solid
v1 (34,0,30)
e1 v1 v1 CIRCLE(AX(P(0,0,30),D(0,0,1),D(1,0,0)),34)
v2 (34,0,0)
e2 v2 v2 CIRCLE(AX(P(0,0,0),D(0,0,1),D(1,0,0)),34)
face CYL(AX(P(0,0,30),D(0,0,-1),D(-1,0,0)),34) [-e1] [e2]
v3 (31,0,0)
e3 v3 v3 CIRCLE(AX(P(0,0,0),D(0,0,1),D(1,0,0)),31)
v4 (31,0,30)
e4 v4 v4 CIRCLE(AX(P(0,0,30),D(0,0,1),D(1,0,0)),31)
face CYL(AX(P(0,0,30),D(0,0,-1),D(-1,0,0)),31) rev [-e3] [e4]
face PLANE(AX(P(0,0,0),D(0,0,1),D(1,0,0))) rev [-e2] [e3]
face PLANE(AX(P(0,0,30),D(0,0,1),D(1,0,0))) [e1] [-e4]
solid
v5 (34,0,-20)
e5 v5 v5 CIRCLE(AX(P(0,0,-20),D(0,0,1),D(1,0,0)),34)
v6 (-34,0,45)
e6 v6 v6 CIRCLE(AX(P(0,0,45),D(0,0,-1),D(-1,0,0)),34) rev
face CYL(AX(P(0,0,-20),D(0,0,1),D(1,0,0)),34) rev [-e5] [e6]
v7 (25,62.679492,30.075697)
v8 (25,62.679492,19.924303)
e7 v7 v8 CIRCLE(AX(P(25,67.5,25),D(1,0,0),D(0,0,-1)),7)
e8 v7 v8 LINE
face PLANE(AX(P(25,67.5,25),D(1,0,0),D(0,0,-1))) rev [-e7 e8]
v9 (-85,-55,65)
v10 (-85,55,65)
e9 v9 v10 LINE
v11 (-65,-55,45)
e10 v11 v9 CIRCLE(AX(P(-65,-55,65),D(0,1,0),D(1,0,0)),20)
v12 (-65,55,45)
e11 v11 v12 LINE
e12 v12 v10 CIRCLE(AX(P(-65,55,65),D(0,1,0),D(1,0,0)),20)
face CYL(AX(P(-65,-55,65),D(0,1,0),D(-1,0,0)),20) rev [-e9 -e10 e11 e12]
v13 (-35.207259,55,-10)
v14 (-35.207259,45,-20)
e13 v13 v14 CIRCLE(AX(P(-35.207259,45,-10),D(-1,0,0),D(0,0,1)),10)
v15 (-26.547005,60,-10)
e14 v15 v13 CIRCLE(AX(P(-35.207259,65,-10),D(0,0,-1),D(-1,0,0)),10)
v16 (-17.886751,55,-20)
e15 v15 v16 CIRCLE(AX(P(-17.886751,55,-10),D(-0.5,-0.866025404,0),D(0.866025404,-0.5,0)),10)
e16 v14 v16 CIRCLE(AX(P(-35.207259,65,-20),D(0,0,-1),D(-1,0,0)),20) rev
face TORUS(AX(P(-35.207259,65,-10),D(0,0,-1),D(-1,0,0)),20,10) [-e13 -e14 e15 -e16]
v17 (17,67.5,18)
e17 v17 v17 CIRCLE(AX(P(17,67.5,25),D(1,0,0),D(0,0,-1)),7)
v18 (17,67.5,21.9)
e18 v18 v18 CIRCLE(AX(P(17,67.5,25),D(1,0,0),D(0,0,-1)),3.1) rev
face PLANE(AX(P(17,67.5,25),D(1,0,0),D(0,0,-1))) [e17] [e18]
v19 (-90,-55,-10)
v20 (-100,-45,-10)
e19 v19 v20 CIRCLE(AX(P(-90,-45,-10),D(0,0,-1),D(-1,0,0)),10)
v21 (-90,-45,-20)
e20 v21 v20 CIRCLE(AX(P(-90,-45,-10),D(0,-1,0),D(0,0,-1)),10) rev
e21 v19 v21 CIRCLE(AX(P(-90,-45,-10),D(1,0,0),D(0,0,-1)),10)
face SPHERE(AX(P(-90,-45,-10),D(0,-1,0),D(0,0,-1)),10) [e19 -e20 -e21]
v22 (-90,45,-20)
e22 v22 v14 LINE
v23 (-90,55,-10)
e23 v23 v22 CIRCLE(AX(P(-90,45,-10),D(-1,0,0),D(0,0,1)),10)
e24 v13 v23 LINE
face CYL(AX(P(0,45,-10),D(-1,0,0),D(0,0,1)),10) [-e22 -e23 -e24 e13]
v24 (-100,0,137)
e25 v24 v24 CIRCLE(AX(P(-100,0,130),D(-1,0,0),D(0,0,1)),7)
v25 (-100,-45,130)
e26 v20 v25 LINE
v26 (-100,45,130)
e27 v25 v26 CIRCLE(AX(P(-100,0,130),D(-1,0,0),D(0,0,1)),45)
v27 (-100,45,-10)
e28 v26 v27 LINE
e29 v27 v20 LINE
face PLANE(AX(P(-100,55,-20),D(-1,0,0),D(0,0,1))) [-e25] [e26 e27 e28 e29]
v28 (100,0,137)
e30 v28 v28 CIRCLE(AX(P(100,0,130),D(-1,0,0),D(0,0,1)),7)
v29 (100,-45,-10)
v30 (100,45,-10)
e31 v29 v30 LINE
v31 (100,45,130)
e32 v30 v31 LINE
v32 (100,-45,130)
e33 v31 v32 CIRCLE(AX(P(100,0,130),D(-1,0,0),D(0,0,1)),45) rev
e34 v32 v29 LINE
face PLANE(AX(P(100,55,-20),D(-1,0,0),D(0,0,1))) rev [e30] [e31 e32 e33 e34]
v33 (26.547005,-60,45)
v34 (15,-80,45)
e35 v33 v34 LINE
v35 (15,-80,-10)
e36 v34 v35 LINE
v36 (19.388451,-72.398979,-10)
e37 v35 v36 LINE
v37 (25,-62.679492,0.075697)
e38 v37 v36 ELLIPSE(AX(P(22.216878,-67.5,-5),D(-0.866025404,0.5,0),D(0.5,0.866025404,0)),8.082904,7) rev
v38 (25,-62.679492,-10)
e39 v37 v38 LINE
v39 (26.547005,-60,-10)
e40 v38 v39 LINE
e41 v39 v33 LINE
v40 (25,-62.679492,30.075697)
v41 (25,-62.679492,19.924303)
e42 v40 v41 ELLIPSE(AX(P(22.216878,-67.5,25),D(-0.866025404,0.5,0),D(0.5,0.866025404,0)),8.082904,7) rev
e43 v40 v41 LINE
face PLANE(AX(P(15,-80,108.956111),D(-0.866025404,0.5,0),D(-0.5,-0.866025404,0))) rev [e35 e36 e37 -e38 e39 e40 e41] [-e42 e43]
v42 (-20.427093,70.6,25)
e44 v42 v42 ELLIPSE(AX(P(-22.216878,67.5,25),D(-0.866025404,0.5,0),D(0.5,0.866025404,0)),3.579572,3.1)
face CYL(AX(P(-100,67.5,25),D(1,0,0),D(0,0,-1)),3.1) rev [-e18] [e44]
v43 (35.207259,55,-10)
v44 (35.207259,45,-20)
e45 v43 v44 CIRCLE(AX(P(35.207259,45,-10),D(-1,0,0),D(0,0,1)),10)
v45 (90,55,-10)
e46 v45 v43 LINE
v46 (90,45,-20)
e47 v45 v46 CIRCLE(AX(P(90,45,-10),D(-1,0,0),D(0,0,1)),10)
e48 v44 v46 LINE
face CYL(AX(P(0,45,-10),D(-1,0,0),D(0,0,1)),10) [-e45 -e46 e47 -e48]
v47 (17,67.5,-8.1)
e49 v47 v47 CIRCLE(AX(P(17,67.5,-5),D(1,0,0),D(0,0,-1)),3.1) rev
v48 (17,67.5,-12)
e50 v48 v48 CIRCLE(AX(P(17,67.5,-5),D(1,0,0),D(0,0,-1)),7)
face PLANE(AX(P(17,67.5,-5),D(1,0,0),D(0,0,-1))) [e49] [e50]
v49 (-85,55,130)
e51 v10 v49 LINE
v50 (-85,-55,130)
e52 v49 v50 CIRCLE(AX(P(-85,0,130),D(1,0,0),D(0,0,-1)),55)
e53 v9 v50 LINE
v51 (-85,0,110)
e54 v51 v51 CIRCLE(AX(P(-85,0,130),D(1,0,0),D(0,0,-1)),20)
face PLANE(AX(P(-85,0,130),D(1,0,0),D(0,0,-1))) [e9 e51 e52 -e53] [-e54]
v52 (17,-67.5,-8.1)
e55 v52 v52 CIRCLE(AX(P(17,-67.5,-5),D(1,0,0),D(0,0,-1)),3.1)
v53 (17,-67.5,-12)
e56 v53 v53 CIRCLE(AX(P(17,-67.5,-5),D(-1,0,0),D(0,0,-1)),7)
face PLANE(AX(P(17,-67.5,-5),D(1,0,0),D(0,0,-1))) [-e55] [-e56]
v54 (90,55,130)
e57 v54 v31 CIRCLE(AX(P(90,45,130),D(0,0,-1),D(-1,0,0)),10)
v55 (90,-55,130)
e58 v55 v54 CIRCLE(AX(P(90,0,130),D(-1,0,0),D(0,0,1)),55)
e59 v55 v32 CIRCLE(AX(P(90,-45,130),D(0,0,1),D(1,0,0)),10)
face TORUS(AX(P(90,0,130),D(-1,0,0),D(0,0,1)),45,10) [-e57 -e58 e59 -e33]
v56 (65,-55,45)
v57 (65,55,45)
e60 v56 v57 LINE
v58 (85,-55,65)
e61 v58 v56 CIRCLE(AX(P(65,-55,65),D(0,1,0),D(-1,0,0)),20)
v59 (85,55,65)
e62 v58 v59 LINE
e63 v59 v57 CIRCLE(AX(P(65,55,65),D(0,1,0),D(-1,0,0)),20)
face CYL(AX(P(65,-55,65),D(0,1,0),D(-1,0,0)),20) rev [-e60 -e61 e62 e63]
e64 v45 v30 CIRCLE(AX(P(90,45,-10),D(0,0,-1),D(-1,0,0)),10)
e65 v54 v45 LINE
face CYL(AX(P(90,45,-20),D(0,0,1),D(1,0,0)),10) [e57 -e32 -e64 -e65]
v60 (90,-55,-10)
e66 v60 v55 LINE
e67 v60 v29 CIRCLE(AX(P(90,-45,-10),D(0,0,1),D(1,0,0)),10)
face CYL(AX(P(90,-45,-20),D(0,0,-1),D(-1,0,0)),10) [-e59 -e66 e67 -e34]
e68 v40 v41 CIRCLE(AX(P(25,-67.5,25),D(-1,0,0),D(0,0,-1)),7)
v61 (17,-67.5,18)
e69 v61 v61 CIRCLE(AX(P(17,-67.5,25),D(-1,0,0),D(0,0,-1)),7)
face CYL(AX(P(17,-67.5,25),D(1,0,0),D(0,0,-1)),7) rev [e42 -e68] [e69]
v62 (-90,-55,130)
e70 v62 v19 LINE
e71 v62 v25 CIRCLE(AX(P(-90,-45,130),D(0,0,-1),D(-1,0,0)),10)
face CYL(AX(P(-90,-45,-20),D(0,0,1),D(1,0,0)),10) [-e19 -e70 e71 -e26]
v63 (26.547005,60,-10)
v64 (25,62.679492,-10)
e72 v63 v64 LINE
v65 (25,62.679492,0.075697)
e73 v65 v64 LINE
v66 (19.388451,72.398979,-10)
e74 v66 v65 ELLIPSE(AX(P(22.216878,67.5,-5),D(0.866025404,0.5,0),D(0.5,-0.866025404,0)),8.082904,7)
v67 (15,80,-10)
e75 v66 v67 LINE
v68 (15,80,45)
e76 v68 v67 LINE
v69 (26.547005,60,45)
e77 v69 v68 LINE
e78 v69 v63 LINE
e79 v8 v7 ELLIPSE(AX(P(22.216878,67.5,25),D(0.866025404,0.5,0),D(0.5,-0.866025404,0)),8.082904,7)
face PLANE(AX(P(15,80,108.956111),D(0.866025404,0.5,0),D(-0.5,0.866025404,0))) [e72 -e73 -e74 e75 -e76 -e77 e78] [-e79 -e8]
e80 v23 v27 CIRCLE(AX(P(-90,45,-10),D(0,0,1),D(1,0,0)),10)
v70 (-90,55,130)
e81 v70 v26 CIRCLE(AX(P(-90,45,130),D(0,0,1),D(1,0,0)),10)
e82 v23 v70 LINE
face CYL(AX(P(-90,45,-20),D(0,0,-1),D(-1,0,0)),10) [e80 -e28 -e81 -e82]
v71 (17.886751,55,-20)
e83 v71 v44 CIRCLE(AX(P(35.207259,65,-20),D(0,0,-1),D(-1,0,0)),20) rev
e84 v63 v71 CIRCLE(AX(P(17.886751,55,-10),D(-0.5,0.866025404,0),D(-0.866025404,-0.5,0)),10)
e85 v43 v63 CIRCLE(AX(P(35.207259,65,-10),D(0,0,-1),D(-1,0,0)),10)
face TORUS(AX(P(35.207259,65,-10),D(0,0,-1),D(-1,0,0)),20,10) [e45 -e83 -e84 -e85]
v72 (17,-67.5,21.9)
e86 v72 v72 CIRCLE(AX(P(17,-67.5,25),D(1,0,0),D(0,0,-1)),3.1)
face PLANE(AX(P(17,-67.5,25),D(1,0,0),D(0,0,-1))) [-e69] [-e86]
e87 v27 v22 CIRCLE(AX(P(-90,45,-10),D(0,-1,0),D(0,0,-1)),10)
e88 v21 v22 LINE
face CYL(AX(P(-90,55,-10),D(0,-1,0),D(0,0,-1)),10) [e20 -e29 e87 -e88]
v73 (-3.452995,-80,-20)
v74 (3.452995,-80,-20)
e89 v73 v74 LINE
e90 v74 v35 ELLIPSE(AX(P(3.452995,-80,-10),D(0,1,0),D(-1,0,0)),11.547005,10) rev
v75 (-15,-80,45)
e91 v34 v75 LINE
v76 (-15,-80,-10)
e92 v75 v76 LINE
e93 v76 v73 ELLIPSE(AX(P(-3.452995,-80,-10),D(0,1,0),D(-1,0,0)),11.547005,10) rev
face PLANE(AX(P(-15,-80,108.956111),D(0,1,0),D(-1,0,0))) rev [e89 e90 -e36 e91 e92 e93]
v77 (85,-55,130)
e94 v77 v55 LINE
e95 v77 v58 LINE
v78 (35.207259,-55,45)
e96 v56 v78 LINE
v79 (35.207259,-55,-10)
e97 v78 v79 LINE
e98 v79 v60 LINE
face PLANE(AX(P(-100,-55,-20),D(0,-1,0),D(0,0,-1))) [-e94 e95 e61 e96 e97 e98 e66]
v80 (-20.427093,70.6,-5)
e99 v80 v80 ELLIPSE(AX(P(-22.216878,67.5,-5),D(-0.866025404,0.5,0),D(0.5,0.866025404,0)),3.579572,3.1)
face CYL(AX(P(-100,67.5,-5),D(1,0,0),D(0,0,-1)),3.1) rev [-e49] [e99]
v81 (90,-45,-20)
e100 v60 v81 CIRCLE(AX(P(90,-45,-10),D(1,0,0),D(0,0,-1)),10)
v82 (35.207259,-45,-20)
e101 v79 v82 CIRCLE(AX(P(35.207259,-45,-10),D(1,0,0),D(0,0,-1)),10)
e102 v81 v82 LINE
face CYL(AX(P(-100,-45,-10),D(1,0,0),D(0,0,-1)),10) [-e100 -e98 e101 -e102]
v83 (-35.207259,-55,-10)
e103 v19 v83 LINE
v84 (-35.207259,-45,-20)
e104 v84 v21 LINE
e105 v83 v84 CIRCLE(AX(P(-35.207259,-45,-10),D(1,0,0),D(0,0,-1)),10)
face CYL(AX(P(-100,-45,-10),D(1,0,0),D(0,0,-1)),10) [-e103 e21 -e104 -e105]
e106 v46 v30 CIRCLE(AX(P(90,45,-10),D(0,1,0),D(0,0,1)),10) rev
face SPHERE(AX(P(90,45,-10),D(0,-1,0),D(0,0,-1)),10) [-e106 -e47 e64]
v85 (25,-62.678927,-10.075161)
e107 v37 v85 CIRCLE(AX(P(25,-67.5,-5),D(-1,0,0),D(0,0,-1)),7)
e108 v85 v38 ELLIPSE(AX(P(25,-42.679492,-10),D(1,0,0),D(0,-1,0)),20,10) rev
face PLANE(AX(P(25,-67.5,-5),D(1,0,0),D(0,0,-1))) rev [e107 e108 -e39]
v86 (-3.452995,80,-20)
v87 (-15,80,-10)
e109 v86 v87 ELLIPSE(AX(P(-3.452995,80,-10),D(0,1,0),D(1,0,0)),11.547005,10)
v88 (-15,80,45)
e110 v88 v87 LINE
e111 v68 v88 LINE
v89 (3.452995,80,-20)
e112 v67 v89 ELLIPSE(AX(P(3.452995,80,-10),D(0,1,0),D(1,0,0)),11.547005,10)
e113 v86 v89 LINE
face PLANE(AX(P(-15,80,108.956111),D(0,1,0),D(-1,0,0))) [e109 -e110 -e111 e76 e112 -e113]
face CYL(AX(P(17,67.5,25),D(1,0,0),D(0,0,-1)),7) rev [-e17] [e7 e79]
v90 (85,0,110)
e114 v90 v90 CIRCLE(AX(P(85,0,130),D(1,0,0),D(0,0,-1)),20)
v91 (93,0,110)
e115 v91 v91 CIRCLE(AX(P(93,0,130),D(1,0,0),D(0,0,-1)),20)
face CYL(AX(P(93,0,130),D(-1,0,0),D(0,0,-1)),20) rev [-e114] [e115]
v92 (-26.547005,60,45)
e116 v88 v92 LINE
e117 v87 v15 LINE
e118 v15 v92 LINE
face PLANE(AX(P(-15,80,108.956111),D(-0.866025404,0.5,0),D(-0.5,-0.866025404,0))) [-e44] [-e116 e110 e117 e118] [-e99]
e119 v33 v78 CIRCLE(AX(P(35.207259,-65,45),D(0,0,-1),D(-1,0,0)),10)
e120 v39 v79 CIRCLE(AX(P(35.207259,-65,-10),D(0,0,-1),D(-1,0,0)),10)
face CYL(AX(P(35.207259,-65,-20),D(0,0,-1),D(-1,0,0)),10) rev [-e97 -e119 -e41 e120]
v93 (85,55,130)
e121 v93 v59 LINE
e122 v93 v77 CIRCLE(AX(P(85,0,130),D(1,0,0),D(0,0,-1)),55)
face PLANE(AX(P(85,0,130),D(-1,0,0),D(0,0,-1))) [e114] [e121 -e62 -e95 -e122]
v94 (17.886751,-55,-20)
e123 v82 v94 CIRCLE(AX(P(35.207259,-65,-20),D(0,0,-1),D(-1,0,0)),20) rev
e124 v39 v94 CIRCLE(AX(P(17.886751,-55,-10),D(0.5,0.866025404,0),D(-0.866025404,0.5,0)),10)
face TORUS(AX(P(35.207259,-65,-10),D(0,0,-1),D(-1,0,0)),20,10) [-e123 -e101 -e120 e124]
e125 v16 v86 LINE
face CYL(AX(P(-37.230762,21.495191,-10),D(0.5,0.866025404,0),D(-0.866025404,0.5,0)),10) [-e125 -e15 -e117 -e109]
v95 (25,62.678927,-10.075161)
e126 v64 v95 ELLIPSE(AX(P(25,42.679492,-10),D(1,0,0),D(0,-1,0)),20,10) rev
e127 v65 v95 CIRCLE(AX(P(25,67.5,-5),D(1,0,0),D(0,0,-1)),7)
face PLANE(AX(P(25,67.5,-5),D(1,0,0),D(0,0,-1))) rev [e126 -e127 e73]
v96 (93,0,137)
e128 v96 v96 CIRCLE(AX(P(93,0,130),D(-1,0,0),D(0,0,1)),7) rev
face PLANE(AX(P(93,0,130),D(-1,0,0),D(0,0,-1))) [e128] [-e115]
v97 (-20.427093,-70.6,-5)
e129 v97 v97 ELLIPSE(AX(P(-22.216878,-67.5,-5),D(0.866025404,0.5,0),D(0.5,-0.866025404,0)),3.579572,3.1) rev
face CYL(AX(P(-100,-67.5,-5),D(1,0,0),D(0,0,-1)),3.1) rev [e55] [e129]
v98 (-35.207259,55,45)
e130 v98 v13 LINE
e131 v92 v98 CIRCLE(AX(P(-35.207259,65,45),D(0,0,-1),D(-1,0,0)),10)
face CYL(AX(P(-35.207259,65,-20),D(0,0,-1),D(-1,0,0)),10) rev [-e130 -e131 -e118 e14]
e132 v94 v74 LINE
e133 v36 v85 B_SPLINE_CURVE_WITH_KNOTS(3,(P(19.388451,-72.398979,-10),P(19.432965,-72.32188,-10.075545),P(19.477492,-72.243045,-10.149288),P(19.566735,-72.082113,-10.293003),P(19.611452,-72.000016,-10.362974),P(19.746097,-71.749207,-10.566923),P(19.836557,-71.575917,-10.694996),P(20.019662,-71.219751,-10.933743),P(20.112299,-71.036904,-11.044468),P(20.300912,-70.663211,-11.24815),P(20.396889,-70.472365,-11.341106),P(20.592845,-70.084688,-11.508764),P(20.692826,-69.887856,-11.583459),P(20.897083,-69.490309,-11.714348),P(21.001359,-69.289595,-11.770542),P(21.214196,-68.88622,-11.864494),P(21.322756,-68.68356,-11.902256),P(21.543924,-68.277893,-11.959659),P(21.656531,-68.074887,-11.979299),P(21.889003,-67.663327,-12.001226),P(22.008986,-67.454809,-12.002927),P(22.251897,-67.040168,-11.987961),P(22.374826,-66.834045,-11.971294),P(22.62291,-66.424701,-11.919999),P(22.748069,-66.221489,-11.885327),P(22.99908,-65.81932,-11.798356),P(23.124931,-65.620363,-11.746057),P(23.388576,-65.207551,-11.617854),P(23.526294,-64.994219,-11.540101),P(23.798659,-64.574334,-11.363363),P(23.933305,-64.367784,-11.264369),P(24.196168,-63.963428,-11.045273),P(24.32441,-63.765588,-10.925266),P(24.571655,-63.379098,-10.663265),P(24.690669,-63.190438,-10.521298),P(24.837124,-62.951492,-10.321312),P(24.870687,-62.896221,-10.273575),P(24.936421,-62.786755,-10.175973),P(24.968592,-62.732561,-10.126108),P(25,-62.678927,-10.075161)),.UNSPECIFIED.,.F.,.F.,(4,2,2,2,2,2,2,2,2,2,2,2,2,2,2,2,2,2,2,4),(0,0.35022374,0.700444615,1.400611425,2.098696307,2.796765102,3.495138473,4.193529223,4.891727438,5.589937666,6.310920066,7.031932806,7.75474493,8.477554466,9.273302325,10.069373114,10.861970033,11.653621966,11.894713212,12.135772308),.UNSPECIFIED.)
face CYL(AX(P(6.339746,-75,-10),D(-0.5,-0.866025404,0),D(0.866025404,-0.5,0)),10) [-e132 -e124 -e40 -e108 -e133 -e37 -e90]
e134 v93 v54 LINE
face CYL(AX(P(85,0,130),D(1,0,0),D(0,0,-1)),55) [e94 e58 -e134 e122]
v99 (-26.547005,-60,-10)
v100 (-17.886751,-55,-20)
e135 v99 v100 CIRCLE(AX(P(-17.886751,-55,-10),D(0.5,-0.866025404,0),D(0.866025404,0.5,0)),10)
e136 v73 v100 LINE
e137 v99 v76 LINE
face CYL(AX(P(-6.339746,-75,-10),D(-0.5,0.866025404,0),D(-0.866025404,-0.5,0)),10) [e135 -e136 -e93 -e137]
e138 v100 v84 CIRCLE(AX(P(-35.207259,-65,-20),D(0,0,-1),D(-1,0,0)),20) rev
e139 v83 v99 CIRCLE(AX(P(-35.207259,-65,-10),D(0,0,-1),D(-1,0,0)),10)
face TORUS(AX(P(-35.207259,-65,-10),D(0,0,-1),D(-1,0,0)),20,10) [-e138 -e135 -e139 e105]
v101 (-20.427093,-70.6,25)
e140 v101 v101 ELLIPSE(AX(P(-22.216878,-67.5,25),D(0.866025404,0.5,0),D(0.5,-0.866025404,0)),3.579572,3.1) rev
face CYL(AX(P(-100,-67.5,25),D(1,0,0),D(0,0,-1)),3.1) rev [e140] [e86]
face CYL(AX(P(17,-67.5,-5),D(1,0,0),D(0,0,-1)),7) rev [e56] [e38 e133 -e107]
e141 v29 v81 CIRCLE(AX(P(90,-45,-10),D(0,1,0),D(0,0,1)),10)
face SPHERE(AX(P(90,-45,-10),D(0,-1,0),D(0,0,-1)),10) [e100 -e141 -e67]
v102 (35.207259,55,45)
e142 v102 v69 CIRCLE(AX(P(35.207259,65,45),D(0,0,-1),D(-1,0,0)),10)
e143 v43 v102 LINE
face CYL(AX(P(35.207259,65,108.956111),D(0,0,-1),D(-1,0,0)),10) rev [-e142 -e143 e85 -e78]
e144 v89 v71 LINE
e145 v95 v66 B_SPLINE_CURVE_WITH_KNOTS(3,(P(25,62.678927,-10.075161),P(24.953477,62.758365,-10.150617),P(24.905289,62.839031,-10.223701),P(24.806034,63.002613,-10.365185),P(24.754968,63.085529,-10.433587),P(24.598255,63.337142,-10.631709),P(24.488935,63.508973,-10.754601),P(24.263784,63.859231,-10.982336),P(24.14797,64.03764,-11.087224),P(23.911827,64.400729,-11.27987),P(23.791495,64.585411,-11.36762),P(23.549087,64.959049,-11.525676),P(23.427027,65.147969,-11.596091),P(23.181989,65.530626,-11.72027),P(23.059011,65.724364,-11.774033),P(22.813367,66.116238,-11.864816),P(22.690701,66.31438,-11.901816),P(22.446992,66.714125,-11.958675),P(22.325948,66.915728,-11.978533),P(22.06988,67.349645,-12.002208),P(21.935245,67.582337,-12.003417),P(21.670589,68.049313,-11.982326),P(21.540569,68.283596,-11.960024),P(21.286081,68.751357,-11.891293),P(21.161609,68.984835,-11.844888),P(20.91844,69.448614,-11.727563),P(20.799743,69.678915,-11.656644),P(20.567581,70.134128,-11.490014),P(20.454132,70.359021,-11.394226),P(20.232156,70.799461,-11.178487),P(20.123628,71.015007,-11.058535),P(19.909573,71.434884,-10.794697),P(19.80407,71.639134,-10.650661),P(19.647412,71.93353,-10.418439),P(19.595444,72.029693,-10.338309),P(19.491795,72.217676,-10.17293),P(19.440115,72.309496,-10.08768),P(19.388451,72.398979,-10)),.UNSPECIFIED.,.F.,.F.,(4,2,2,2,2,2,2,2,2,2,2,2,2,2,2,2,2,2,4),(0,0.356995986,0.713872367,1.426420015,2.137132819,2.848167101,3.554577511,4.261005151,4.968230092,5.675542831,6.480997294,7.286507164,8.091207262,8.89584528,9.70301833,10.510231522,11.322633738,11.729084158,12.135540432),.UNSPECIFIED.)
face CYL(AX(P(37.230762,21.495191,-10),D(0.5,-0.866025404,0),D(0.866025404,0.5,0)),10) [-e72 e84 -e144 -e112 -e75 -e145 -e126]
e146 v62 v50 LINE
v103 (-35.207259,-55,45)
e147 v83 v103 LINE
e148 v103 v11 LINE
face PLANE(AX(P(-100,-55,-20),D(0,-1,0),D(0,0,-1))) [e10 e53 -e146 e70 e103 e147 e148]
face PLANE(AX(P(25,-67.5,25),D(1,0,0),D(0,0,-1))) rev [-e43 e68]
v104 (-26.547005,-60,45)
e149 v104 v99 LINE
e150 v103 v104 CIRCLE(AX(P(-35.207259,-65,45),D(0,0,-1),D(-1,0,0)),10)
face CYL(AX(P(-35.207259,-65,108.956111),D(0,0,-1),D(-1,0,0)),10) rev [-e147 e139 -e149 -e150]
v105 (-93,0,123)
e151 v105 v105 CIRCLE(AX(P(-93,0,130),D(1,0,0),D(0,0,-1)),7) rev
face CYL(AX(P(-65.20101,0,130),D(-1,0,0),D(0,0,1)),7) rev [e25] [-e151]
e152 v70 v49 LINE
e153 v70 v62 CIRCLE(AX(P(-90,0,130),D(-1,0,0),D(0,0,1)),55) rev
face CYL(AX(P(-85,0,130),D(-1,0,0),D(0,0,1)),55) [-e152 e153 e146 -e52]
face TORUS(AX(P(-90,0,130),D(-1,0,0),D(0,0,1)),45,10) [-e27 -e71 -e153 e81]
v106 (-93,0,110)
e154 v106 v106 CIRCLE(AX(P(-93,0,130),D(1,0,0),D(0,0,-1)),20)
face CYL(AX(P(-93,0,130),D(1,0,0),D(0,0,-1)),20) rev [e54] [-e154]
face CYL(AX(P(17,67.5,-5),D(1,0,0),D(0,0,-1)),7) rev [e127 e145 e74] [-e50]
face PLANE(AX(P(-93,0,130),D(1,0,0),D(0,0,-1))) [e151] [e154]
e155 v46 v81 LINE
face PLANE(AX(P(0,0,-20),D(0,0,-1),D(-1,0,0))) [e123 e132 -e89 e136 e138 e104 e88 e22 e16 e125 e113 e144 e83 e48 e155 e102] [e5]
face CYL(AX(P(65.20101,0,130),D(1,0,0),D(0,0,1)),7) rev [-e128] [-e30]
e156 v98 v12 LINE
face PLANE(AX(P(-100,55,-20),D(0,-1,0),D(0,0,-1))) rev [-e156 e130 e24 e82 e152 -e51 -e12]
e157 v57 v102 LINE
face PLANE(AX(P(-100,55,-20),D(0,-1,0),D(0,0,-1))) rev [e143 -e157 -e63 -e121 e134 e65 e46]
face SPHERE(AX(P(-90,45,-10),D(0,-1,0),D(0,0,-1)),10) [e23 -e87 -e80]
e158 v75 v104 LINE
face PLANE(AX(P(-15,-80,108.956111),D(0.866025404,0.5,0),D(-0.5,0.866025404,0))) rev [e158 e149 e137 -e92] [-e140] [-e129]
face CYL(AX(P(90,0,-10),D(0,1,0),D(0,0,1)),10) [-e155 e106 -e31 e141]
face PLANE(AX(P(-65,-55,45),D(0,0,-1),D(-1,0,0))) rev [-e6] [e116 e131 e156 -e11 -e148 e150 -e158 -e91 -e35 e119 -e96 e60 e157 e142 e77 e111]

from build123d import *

# Parameters (mm, degrees)
SKETCH1_R                 = 34
SKETCH1_R_2               = 31
CENTRE_HOLE_FOR_L2_DEPTH  = 30
MAIN_STRUCTURE_DEPTH      = 100
MAIN_STRUCTURE_DEPTH_BACK = 50
SKETCH2_W                 = 200
SKETCH2_H                 = 110
SKETCH2_R                 = 34
BEARING_CURVE_DEPTH       = 15
SKETCH6_R                 = 7
CUT_EXTRUDE2_DEPTH        = 15
WRIST_CUTOUT_DEPTH        = 238.328885726
SKETCH9_R                 = 20
CUT_EXTRUDE3_DEPTH        = 8
FILLET2_R                 = 10
BOSS_EXTRUDE4_DEPTH       = 65
SKETCH11_R                = 3.1
CUT_EXTRUDE6_DEPTH        = 226
CUT_EXTRUDE8_START        = 17
CUT_EXTRUDE8_OUTLINE_R    = 7
CUT_EXTRUDE8_OUTLINE_R_2  = 3.1
CUT_EXTRUDE8_DEPTH        = 8
FILLET3_R                 = 10
FILLET1_R                 = 10


# Read off the part's stored shape, not the designer's step: Cut-Extrude8
with BuildPart() as part:
    # Sketch1 → Centre Hole for L2 (new body)
    with BuildSketch(Plane.XY):
        Circle(SKETCH1_R)
        Circle(SKETCH1_R_2, mode=Mode.SUBTRACT)
    extrude(amount=CENTRE_HOLE_FOR_L2_DEPTH)


with BuildPart() as body_2:
    # Sketch2 → Main Structure (new, two sides: drawn at the far end of the back side and taken through both)
    with BuildSketch(Plane.XY.offset(30).offset(-MAIN_STRUCTURE_DEPTH_BACK)):
        Rectangle(SKETCH2_W, SKETCH2_H)
        Circle(SKETCH2_R, mode=Mode.SUBTRACT)
    extrude(amount=MAIN_STRUCTURE_DEPTH + MAIN_STRUCTURE_DEPTH_BACK)

    # Sketch3 → Bearing Curve (add)
    with BuildSketch(Plane.ZY.offset(100)):
        with BuildLine():
            Line((130, 55), (130, -55))
            ThreePointArc((130, -55), (185, 0), (130, 55))
        make_face()
    bearing_curve = extrude(amount=-BEARING_CURVE_DEPTH)

    # Mirror7: Bearing Curve across plane
    add(bearing_curve.mirror(Plane(origin=(0, 0, 0), x_dir=(0, 0, 1), z_dir=(1, 0, 0))))

    # Sketch6 → Cut-Extrude2 (cut)
    with BuildSketch(Plane.ZY.offset(100)):
        with Locations((130, 0)):
            Circle(SKETCH6_R)
    cut_extrude2 = extrude(amount=-CUT_EXTRUDE2_DEPTH, mode=Mode.SUBTRACT)

    # Sketch4 → Wrist Cutout (cut, through all)
    with BuildSketch(Plane(origin=(0, 55, 0), x_dir=(1, 0, 0), z_dir=(0, 1, 0))):
        with BuildLine():
            Line((-85, -130), (-85, -65))
            ThreePointArc((-85, -65), (-79.142135624, -50.857864376), (-65, -45))
            Line((-65, -45), (65, -45))
            ThreePointArc((65, -45), (79.142135624, -50.857864376), (85, -65))
            Line((85, -65), (85, -130))
            Line((85, -130), (-85, -130))
        make_face()
    extrude(amount=-WRIST_CUTOUT_DEPTH, mode=Mode.SUBTRACT)

    # Sketch9 → Cut-Extrude3 (cut)
    with BuildSketch(Plane(origin=(-85, 0, 0), x_dir=(0, 0, -1), z_dir=(1, 0, 0))):
        with Locations((-130, 0)):
            Circle(SKETCH9_R)
    cut_extrude3 = extrude(amount=-CUT_EXTRUDE3_DEPTH, mode=Mode.SUBTRACT)

    # Mirror6: Cut-Extrude2, Cut-Extrude3 across plane
    add(cut_extrude2.mirror(Plane(origin=(0, 0, 0), x_dir=(0, 0, 1), z_dir=(1, 0, 0))), mode=Mode.SUBTRACT)
    add(cut_extrude3.mirror(Plane(origin=(0, 0, 0), x_dir=(0, 0, 1), z_dir=(1, 0, 0))), mode=Mode.SUBTRACT)

    # Fillet2
    fillet2_edges = [body_2.edges().sort_by_distance(p)[0] for p in [
        (-100, 0, -20),
        (100, 0, -20),
    ]]
    fillet(fillet2_edges, radius=FILLET2_R)

    # Sketch10 → Boss-Extrude4 (add)
    with BuildSketch(Plane(origin=(0, 0, -20), x_dir=(-1, 0, 0), z_dir=(0, 0, -1))):
        Polygon((15, 80), (-15, 80), (-29.43375673, 55), (29.43375673, 55), align=None)
    boss_extrude4 = extrude(amount=-BOSS_EXTRUDE4_DEPTH)

    # Sketch11 → Cut-Extrude6 (cut, symmetric)
    with BuildSketch(Plane(origin=(0, 0, 0), x_dir=(0, 0, -1), z_dir=(1, 0, 0))):
        with Locations(Location((5, 67.5, 0), (0, 0, 90))):
            Circle(SKETCH11_R)
        with Locations(Location((-25, 67.5, 0), (0, 0, 90))):
            Circle(SKETCH11_R)
    cut_extrude6 = extrude(amount=CUT_EXTRUDE6_DEPTH, both=True, mode=Mode.SUBTRACT)

    # Cut-Extrude8 outline → Cut-Extrude8 (cut)
    # profile 1 of 2: a face of its own
    with BuildSketch(Plane(origin=(0, 0, 0), x_dir=(0, 0, -1), z_dir=(1, 0, 0)).offset(CUT_EXTRUDE8_START)):
        with Locations((5, 67.5)):
            Circle(CUT_EXTRUDE8_OUTLINE_R)
        with Locations((5, 67.5)):
            Circle(CUT_EXTRUDE8_OUTLINE_R_2, mode=Mode.SUBTRACT)
    # profile 2 of 2: a face of its own
    with BuildSketch(Plane(origin=(0, 0, 0), x_dir=(0, 0, -1), z_dir=(1, 0, 0)).offset(CUT_EXTRUDE8_START)):
        with Locations((-25, 67.5)):
            Circle(CUT_EXTRUDE8_OUTLINE_R)
        with Locations((-25, 67.5)):
            Circle(CUT_EXTRUDE8_OUTLINE_R_2, mode=Mode.SUBTRACT)
    cut_extrude8 = extrude(amount=CUT_EXTRUDE8_DEPTH, mode=Mode.SUBTRACT)

    # Mirror8: Boss-Extrude4, Cut-Extrude6, Cut-Extrude8 across plane
    add(boss_extrude4.mirror(Plane.ZX))
    add(cut_extrude6.mirror(Plane.ZX), mode=Mode.SUBTRACT)
    add(cut_extrude8.mirror(Plane.ZX), mode=Mode.SUBTRACT)

    # Fillet3
    fillet3_edges = [body_2.edges().sort_by_distance(p)[0] for p in [
        (-29.43375673, 55, 12.5),
        (29.43375673, 55, 12.5),
        (29.43375673, -55, 12.5),
        (-29.43375673, -55, 12.5),
    ]]
    fillet(fillet3_edges, radius=FILLET3_R)

    # Fillet1
    # the kernel refuses this fillet: 10 mm, written as the material it takes off along each edge
    with BuildSketch(Plane(origin=(-100, 55, 130), x_dir=(1, 0, 0), z_dir=(0, 0, -1)), Plane(origin=(-100, -55, -10), x_dir=(1, 0, 0), z_dir=(0, 0, 1))) as fillet1_piece_1:
        with BuildLine():
            CenterArc((FILLET1_R, FILLET1_R), FILLET1_R, 180, 90)
            Line((0, FILLET1_R), (0, 0))
            Line((0, 0), (FILLET1_R, 0))
        make_face()
    extrude(amount=140, mode=Mode.SUBTRACT)
    with BuildSketch(Plane(origin=(100, -55, -10), x_dir=(-1, 0, 0), z_dir=(0, 0, 1)), Plane(origin=(100, 55, 130), x_dir=(-1, 0, 0), z_dir=(0, 0, -1))) as fillet1_piece_2:
        with BuildLine():
            CenterArc((FILLET1_R, -FILLET1_R), FILLET1_R, 90, 90)
            Line((0, -FILLET1_R), (0, 0))
            Line((0, 0), (FILLET1_R, 0))
        make_face()
    extrude(amount=140, mode=Mode.SUBTRACT)
    with BuildSketch(Plane(origin=(-100, 0, 130), x_dir=(0, -1, 0), z_dir=(0, 0, -1))) as fillet1_piece_3:
        with BuildLine():
            CenterArc((55 - FILLET1_R, -FILLET1_R), FILLET1_R, 0, 90)
            Line((55, -FILLET1_R), (55, 0))
            Line((55, 0), (55 - FILLET1_R, 0))
        make_face()
    revolve(axis=Axis((-100, 0, 130), (-1, 0, 0)), revolution_arc=180, mode=Mode.SUBTRACT)
    with BuildSketch(Plane(origin=(-26.547005384, -60, -20), x_dir=(0, 0, 1), z_dir=(0.5000000000000004, -0.8660254037844384, 0)), Plane(origin=(2.5, -101.650635095, -20), x_dir=(0, 0, 1), z_dir=(0.4999999999999977, 0.86602540378444, 0))) as fillet1_piece_4:
        with BuildLine():
            CenterArc((FILLET1_R, -FILLET1_R), FILLET1_R, 90, 90)
            Line((0, -FILLET1_R), (0, 0))
            Line((0, 0), (FILLET1_R, 0))
        make_face()
    extrude(amount=48.094010768, mode=Mode.SUBTRACT)
    with BuildSketch(Plane(origin=(-35.207259422, -65, -20), x_dir=(0.8660254037844382, 0.5000000000000007, 0), z_dir=(0.5000000000000007, -0.8660254037844382, 0))) as fillet1_piece_5:
        with BuildLine():
            CenterArc((10 + FILLET1_R, FILLET1_R), FILLET1_R, 180, 90)
            Line((10 + FILLET1_R, 0), (10, 0))
            Line((10, 0), (10, FILLET1_R))
        make_face()
    revolve(axis=Axis((-35.207259422, -65, -20), (0, 0, 1)), revolution_arc=60, mode=Mode.SUBTRACT)
    with BuildSketch(Plane(origin=(-90, -55, -20), x_dir=(0, 0, 1), z_dir=(1, 0, 0)), Plane(origin=(-35.207259422, 55, -20), x_dir=(0, 0, 1), z_dir=(-1, 0, 0)), Plane(origin=(90, 55, -20), x_dir=(0, 0, 1), z_dir=(-1, 0, 0)), Plane(origin=(35.207259422, -55, -20), x_dir=(0, 0, 1), z_dir=(1, 0, 0))) as fillet1_piece_6:
        with BuildLine():
            CenterArc((FILLET1_R, -FILLET1_R), FILLET1_R, 90, 90)
            Line((0, -FILLET1_R), (0, 0))
            Line((0, 0), (FILLET1_R, 0))
        make_face()
    extrude(amount=54.792740578, mode=Mode.SUBTRACT)
    with BuildSketch(Plane(origin=(-90, -55, -10), x_dir=(-1, 0, 0), z_dir=(0, 0, 1))) as fillet1_piece_7:
        with BuildLine():
            CenterArc((10 - FILLET1_R, -FILLET1_R), FILLET1_R, 0, 90)
            Line((10, -FILLET1_R), (10, 0))
            Line((10, 0), (10 - FILLET1_R, 0))
        make_face()
    revolve(axis=Axis((-90, -55, -10), (0, -1, 0)), revolution_arc=90, mode=Mode.SUBTRACT)
    with BuildSketch(Plane(origin=(-26.547005384, 60, -20), x_dir=(0, 0, 1), z_dir=(0.5000000000000004, 0.8660254037844384, 0)), Plane(origin=(2.5, 101.650635095, -20), x_dir=(0, 0, 1), z_dir=(0.4999999999999977, -0.86602540378444, 0))) as fillet1_piece_8:
        with BuildLine():
            CenterArc((FILLET1_R, FILLET1_R), FILLET1_R, 180, 90)
            Line((0, FILLET1_R), (0, 0))
            Line((0, 0), (FILLET1_R, 0))
        make_face()
    extrude(amount=48.094010768, mode=Mode.SUBTRACT)
    with BuildSketch(Plane(origin=(-35.207259422, 65, -20), x_dir=(0.8660254037844386, -0.5, 0), z_dir=(0.5, 0.8660254037844386, 0))) as fillet1_piece_9:
        with BuildLine():
            CenterArc((10 + FILLET1_R, -FILLET1_R), FILLET1_R, 90, 90)
            Line((10 + FILLET1_R, 0), (10, 0))
            Line((10, 0), (10, -FILLET1_R))
        make_face()
    revolve(axis=Axis((-35.207259422, 65, -20), (0, 0, -1)), revolution_arc=60, mode=Mode.SUBTRACT)
    with BuildSketch(Plane(origin=(-90, 55, -10), x_dir=(-1, 0, 0), z_dir=(0, 0, 1))) as fillet1_piece_10:
        with BuildLine():
            CenterArc((10 - FILLET1_R, FILLET1_R), FILLET1_R, 270, 90)
            Line((10, FILLET1_R), (10, 0))
            Line((10, 0), (10 - FILLET1_R, 0))
        make_face()
    revolve(axis=Axis((-90, 55, -10), (0, -1, 0)), revolution_arc=90, mode=Mode.SUBTRACT)
    with BuildSketch(Plane(origin=(35.207259422, 65, -20), x_dir=(-0.8660254037844404, -0.49999999999999717, 0), z_dir=(-0.49999999999999717, 0.8660254037844404, 0))) as fillet1_piece_11:
        with BuildLine():
            CenterArc((10 + FILLET1_R, FILLET1_R), FILLET1_R, 180, 90)
            Line((10 + FILLET1_R, 0), (10, 0))
            Line((10, 0), (10, FILLET1_R))
        make_face()
    revolve(axis=Axis((35.207259422, 65, -20), (0, 0, 1)), revolution_arc=60, mode=Mode.SUBTRACT)
    with BuildSketch(Plane(origin=(90, 55, -10), x_dir=(0, 0, -1), z_dir=(-1, 0, 0))) as fillet1_piece_12:
        with BuildLine():
            CenterArc((10 - FILLET1_R, FILLET1_R), FILLET1_R, 270, 90)
            Line((10, FILLET1_R), (10, 0))
            Line((10, 0), (10 - FILLET1_R, 0))
        make_face()
    revolve(axis=Axis((90, 55, -10), (0, -1, 0)), revolution_arc=90, mode=Mode.SUBTRACT)
    with BuildSketch(Plane(origin=(35.207259422, -65, -20), x_dir=(0, 1, 0), z_dir=(1, 0, 0))) as fillet1_piece_13:
        with BuildLine():
            CenterArc((10 + FILLET1_R, FILLET1_R), FILLET1_R, 180, 90)
            Line((10 + FILLET1_R, 0), (10, 0))
            Line((10, 0), (10, FILLET1_R))
        make_face()
    revolve(axis=Axis((35.207259422, -65, -20), (0, 0, 1)), revolution_arc=60, mode=Mode.SUBTRACT)
    with BuildSketch(Plane(origin=(90, -55, -10), x_dir=(0, 0, -1), z_dir=(-1, 0, 0))) as fillet1_piece_14:
        with BuildLine():
            CenterArc((10 - FILLET1_R, -FILLET1_R), FILLET1_R, 0, 90)
            Line((10, -FILLET1_R), (10, 0))
            Line((10, 0), (10 - FILLET1_R, 0))
        make_face()
    revolve(axis=Axis((90, -55, -10), (0, -1, 0)), revolution_arc=90, mode=Mode.SUBTRACT)
    with BuildSketch(Plane(origin=(100, 0, 130), x_dir=(0, -1, 0), z_dir=(0, 0, -1))) as fillet1_piece_15:
        with BuildLine():
            CenterArc((55 - FILLET1_R, FILLET1_R), FILLET1_R, 270, 90)
            Line((55, FILLET1_R), (55, 0))
            Line((55, 0), (55 - FILLET1_R, 0))
        make_face()
    revolve(axis=Axis((100, 0, 130), (-1, 0, 0)), revolution_arc=180, mode=Mode.SUBTRACT)


solid = Compound([part.part, body_2.part])
